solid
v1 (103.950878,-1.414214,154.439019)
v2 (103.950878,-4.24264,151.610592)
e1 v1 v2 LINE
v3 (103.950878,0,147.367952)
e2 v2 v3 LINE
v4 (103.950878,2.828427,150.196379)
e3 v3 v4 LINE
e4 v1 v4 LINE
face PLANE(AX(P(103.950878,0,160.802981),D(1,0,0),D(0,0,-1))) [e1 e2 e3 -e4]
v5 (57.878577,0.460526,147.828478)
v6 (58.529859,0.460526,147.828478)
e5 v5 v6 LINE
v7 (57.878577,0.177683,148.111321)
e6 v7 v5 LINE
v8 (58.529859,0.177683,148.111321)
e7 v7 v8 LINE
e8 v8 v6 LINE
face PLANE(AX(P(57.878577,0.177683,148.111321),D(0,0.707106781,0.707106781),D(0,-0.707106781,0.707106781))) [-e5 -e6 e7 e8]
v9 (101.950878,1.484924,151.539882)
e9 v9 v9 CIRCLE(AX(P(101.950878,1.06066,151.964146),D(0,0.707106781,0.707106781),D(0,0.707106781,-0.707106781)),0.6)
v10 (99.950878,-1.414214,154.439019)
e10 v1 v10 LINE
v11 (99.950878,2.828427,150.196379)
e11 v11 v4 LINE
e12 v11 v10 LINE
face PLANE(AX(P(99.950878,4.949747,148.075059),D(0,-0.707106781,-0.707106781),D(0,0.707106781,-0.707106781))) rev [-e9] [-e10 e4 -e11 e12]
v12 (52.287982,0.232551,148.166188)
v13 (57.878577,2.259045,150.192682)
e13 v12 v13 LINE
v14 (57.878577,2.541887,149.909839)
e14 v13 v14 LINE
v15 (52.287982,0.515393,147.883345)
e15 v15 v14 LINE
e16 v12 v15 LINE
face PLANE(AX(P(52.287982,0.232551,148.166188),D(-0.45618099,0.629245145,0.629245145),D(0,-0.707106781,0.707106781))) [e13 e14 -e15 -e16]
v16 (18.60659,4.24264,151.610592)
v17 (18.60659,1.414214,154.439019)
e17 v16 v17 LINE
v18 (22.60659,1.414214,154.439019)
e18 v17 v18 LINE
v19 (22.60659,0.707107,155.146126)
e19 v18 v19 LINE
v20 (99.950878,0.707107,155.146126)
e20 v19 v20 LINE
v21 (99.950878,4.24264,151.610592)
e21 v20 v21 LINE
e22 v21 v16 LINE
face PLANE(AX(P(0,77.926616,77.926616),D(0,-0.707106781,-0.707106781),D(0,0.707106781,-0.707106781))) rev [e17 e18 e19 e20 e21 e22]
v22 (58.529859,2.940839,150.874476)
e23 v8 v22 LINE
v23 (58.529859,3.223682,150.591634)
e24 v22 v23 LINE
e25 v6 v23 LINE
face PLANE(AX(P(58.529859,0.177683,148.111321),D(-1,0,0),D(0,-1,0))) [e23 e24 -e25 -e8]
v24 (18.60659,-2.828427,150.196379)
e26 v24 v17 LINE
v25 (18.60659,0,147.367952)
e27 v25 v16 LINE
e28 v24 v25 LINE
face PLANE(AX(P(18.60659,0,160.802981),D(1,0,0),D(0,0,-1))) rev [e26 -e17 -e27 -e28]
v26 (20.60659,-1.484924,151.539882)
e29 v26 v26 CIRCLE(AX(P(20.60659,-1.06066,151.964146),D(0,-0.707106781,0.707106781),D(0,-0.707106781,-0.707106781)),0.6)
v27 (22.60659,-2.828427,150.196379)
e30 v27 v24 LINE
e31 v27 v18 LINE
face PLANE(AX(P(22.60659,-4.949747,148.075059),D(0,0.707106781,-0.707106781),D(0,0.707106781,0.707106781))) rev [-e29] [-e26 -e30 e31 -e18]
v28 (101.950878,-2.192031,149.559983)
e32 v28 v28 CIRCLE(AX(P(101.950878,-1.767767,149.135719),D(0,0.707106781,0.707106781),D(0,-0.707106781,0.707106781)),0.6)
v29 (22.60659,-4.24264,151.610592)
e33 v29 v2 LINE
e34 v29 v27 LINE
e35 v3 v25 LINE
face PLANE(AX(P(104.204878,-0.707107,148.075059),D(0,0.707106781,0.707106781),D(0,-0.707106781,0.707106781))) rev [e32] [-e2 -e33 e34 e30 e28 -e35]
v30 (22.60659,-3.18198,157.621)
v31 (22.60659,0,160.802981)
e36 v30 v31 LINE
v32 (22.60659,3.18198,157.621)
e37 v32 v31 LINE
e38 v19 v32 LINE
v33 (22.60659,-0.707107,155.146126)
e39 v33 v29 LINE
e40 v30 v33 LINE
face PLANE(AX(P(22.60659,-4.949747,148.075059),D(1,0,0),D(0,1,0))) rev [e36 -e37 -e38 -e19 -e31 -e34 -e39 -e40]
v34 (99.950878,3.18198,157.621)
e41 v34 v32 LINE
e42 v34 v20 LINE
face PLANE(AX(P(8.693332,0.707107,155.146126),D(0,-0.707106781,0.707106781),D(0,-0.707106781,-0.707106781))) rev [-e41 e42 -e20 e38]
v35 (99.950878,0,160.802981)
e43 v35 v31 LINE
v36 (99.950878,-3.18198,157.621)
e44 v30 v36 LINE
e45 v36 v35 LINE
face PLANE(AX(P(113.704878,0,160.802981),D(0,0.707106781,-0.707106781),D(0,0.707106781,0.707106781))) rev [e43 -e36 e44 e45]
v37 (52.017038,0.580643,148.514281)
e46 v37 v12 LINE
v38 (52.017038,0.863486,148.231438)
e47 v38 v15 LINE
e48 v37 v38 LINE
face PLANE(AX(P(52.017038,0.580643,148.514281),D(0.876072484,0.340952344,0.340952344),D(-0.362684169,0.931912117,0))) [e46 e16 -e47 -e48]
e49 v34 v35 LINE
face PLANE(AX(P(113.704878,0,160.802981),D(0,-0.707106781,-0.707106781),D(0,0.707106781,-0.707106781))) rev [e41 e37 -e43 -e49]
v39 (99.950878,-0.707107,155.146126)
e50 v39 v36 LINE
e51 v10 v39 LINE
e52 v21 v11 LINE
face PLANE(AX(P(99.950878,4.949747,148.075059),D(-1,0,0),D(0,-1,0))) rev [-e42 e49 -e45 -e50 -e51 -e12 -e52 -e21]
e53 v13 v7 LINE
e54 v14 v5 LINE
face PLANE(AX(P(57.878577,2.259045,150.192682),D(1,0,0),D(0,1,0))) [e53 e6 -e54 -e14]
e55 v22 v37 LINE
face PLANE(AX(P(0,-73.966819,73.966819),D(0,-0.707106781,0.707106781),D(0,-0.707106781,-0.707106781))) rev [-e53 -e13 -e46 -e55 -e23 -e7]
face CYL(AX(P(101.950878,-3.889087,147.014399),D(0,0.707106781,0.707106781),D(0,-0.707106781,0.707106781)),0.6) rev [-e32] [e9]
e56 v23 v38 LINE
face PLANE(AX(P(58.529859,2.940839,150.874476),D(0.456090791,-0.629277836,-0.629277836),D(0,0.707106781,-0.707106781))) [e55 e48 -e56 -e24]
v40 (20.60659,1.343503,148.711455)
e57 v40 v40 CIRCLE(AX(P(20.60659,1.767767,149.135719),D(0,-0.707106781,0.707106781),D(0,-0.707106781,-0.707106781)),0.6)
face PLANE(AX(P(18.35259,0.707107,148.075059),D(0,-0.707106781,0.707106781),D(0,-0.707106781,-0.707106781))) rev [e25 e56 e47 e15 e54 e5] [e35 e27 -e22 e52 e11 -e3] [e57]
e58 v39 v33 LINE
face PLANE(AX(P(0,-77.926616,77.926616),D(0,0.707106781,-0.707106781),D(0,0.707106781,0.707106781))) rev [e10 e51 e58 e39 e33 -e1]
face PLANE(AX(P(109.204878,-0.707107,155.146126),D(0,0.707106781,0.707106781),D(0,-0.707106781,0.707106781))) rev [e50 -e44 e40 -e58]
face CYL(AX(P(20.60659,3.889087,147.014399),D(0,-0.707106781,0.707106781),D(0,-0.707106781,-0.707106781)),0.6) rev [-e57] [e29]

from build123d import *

# Parameters (mm, degrees)
STOCK_GOUX_START         = 18.606590305
STOCK_GOUX_LIKED_1_DEPTH = 85.344287899
BOSS_EXTRUDE1_DEPTH      = 85.344288
SKETCH2_W                = 4
SKETCH2_H                = 5.500000112
CUT_EXTRUDE1_DEPTH       = 157.288398843
SKETCH3_R                = 0.6
CUT_EXTRUDE2_DEPTH       = 157.307592951
CIRPATTERN1_COUNT        = 2
CUT_EXTRUDE3_DEPTH       = 0.4


# Read off the part's stored shape, not the designer's step: Stock-Goux Liked-1
with BuildPart() as part:
    # Stock-Goux Liked-1 outline → Stock-Goux Liked-1 (new body)
    with BuildSketch(Plane.YZ.offset(STOCK_GOUX_START)):
        Polygon((-4.242640464, 151.610592485), (-3.889087062, 151.257039083), (0, 155.146126145), (3.889087062, 151.257039083), (4.242640464, 151.610592485), (0.707106624, 155.146126325), (3.181980438, 157.621000138), (0, 160.802980576), (-3.181980438, 157.621000138), (-0.707106624, 155.146126325), align=None)
    extrude(amount=STOCK_GOUX_LIKED_1_DEPTH)

    # Sketch1 → Boss-Extrude1 (add)
    with BuildSketch(Plane.ZY.offset(-18.606590305)):
        Polygon((151.257039083, 3.889087062), (147.367952022, 0), (151.257039083, -3.889087062), (155.146126145, 0), align=None)
    extrude(amount=-BOSS_EXTRUDE1_DEPTH)

    # Sketch2 → Cut-Extrude1 (cut, symmetric)
    with BuildSketch(Plane(origin=(0, 77.926616474, 77.926616474), x_dir=(1, 0, 0), z_dir=(-7.406550393246798e-15, 0.7071067811865402, 0.7071067811865549))):
        with Locations((20.606590305, -110.954877944)):
            Rectangle(SKETCH2_W, SKETCH2_H)
    cut_extrude1 = extrude(amount=CUT_EXTRUDE1_DEPTH, both=True, mode=Mode.SUBTRACT)

    # Sketch3 → Cut-Extrude2 (cut, through all)
    with BuildSketch(Plane(origin=(0, -76.512402912, 76.512402912), x_dir=(1, 0, 0), z_dir=(4.90653893338685e-15, -0.7071067811865547, 0.7071067811865404))):
        with Locations(Location((20.606590305, 106.704878157, 0), (0, 0, 270))):
            Circle(SKETCH3_R)
    cut_extrude2 = extrude(amount=-CUT_EXTRUDE2_DEPTH, mode=Mode.SUBTRACT)

    # CirPattern1: Cut-Extrude1, Cut-Extrude2 ×2 about axis
    cirpattern1_axis = Axis((61.278734255, 0, 0), (0, 0, 1))
    add([cut_extrude1.rotate(cirpattern1_axis, i * 360 / CIRPATTERN1_COUNT) for i in range(1, CIRPATTERN1_COUNT)], mode=Mode.SUBTRACT)
    add([cut_extrude2.rotate(cirpattern1_axis, i * 360 / CIRPATTERN1_COUNT) for i in range(1, CIRPATTERN1_COUNT)], mode=Mode.SUBTRACT)

    # Sketch4 → Cut-Extrude3 (cut)
    with BuildSketch(Plane(origin=(0, -73.683976011, 73.683976011), x_dir=(1, 0, 0), z_dir=(-7.520852272753644e-15, 0.7071067811865547, -0.7071067811865404))):
        Polygon((58.529858576, -104.856160255), (58.529858576, -108.763852563), (52.017038063, -105.42603205), (52.287981573, -104.933754406), (57.878576525, -107.799649839), (57.878576525, -104.856160255), align=None)
    extrude(amount=-CUT_EXTRUDE3_DEPTH, mode=Mode.SUBTRACT)


solid = part.part
